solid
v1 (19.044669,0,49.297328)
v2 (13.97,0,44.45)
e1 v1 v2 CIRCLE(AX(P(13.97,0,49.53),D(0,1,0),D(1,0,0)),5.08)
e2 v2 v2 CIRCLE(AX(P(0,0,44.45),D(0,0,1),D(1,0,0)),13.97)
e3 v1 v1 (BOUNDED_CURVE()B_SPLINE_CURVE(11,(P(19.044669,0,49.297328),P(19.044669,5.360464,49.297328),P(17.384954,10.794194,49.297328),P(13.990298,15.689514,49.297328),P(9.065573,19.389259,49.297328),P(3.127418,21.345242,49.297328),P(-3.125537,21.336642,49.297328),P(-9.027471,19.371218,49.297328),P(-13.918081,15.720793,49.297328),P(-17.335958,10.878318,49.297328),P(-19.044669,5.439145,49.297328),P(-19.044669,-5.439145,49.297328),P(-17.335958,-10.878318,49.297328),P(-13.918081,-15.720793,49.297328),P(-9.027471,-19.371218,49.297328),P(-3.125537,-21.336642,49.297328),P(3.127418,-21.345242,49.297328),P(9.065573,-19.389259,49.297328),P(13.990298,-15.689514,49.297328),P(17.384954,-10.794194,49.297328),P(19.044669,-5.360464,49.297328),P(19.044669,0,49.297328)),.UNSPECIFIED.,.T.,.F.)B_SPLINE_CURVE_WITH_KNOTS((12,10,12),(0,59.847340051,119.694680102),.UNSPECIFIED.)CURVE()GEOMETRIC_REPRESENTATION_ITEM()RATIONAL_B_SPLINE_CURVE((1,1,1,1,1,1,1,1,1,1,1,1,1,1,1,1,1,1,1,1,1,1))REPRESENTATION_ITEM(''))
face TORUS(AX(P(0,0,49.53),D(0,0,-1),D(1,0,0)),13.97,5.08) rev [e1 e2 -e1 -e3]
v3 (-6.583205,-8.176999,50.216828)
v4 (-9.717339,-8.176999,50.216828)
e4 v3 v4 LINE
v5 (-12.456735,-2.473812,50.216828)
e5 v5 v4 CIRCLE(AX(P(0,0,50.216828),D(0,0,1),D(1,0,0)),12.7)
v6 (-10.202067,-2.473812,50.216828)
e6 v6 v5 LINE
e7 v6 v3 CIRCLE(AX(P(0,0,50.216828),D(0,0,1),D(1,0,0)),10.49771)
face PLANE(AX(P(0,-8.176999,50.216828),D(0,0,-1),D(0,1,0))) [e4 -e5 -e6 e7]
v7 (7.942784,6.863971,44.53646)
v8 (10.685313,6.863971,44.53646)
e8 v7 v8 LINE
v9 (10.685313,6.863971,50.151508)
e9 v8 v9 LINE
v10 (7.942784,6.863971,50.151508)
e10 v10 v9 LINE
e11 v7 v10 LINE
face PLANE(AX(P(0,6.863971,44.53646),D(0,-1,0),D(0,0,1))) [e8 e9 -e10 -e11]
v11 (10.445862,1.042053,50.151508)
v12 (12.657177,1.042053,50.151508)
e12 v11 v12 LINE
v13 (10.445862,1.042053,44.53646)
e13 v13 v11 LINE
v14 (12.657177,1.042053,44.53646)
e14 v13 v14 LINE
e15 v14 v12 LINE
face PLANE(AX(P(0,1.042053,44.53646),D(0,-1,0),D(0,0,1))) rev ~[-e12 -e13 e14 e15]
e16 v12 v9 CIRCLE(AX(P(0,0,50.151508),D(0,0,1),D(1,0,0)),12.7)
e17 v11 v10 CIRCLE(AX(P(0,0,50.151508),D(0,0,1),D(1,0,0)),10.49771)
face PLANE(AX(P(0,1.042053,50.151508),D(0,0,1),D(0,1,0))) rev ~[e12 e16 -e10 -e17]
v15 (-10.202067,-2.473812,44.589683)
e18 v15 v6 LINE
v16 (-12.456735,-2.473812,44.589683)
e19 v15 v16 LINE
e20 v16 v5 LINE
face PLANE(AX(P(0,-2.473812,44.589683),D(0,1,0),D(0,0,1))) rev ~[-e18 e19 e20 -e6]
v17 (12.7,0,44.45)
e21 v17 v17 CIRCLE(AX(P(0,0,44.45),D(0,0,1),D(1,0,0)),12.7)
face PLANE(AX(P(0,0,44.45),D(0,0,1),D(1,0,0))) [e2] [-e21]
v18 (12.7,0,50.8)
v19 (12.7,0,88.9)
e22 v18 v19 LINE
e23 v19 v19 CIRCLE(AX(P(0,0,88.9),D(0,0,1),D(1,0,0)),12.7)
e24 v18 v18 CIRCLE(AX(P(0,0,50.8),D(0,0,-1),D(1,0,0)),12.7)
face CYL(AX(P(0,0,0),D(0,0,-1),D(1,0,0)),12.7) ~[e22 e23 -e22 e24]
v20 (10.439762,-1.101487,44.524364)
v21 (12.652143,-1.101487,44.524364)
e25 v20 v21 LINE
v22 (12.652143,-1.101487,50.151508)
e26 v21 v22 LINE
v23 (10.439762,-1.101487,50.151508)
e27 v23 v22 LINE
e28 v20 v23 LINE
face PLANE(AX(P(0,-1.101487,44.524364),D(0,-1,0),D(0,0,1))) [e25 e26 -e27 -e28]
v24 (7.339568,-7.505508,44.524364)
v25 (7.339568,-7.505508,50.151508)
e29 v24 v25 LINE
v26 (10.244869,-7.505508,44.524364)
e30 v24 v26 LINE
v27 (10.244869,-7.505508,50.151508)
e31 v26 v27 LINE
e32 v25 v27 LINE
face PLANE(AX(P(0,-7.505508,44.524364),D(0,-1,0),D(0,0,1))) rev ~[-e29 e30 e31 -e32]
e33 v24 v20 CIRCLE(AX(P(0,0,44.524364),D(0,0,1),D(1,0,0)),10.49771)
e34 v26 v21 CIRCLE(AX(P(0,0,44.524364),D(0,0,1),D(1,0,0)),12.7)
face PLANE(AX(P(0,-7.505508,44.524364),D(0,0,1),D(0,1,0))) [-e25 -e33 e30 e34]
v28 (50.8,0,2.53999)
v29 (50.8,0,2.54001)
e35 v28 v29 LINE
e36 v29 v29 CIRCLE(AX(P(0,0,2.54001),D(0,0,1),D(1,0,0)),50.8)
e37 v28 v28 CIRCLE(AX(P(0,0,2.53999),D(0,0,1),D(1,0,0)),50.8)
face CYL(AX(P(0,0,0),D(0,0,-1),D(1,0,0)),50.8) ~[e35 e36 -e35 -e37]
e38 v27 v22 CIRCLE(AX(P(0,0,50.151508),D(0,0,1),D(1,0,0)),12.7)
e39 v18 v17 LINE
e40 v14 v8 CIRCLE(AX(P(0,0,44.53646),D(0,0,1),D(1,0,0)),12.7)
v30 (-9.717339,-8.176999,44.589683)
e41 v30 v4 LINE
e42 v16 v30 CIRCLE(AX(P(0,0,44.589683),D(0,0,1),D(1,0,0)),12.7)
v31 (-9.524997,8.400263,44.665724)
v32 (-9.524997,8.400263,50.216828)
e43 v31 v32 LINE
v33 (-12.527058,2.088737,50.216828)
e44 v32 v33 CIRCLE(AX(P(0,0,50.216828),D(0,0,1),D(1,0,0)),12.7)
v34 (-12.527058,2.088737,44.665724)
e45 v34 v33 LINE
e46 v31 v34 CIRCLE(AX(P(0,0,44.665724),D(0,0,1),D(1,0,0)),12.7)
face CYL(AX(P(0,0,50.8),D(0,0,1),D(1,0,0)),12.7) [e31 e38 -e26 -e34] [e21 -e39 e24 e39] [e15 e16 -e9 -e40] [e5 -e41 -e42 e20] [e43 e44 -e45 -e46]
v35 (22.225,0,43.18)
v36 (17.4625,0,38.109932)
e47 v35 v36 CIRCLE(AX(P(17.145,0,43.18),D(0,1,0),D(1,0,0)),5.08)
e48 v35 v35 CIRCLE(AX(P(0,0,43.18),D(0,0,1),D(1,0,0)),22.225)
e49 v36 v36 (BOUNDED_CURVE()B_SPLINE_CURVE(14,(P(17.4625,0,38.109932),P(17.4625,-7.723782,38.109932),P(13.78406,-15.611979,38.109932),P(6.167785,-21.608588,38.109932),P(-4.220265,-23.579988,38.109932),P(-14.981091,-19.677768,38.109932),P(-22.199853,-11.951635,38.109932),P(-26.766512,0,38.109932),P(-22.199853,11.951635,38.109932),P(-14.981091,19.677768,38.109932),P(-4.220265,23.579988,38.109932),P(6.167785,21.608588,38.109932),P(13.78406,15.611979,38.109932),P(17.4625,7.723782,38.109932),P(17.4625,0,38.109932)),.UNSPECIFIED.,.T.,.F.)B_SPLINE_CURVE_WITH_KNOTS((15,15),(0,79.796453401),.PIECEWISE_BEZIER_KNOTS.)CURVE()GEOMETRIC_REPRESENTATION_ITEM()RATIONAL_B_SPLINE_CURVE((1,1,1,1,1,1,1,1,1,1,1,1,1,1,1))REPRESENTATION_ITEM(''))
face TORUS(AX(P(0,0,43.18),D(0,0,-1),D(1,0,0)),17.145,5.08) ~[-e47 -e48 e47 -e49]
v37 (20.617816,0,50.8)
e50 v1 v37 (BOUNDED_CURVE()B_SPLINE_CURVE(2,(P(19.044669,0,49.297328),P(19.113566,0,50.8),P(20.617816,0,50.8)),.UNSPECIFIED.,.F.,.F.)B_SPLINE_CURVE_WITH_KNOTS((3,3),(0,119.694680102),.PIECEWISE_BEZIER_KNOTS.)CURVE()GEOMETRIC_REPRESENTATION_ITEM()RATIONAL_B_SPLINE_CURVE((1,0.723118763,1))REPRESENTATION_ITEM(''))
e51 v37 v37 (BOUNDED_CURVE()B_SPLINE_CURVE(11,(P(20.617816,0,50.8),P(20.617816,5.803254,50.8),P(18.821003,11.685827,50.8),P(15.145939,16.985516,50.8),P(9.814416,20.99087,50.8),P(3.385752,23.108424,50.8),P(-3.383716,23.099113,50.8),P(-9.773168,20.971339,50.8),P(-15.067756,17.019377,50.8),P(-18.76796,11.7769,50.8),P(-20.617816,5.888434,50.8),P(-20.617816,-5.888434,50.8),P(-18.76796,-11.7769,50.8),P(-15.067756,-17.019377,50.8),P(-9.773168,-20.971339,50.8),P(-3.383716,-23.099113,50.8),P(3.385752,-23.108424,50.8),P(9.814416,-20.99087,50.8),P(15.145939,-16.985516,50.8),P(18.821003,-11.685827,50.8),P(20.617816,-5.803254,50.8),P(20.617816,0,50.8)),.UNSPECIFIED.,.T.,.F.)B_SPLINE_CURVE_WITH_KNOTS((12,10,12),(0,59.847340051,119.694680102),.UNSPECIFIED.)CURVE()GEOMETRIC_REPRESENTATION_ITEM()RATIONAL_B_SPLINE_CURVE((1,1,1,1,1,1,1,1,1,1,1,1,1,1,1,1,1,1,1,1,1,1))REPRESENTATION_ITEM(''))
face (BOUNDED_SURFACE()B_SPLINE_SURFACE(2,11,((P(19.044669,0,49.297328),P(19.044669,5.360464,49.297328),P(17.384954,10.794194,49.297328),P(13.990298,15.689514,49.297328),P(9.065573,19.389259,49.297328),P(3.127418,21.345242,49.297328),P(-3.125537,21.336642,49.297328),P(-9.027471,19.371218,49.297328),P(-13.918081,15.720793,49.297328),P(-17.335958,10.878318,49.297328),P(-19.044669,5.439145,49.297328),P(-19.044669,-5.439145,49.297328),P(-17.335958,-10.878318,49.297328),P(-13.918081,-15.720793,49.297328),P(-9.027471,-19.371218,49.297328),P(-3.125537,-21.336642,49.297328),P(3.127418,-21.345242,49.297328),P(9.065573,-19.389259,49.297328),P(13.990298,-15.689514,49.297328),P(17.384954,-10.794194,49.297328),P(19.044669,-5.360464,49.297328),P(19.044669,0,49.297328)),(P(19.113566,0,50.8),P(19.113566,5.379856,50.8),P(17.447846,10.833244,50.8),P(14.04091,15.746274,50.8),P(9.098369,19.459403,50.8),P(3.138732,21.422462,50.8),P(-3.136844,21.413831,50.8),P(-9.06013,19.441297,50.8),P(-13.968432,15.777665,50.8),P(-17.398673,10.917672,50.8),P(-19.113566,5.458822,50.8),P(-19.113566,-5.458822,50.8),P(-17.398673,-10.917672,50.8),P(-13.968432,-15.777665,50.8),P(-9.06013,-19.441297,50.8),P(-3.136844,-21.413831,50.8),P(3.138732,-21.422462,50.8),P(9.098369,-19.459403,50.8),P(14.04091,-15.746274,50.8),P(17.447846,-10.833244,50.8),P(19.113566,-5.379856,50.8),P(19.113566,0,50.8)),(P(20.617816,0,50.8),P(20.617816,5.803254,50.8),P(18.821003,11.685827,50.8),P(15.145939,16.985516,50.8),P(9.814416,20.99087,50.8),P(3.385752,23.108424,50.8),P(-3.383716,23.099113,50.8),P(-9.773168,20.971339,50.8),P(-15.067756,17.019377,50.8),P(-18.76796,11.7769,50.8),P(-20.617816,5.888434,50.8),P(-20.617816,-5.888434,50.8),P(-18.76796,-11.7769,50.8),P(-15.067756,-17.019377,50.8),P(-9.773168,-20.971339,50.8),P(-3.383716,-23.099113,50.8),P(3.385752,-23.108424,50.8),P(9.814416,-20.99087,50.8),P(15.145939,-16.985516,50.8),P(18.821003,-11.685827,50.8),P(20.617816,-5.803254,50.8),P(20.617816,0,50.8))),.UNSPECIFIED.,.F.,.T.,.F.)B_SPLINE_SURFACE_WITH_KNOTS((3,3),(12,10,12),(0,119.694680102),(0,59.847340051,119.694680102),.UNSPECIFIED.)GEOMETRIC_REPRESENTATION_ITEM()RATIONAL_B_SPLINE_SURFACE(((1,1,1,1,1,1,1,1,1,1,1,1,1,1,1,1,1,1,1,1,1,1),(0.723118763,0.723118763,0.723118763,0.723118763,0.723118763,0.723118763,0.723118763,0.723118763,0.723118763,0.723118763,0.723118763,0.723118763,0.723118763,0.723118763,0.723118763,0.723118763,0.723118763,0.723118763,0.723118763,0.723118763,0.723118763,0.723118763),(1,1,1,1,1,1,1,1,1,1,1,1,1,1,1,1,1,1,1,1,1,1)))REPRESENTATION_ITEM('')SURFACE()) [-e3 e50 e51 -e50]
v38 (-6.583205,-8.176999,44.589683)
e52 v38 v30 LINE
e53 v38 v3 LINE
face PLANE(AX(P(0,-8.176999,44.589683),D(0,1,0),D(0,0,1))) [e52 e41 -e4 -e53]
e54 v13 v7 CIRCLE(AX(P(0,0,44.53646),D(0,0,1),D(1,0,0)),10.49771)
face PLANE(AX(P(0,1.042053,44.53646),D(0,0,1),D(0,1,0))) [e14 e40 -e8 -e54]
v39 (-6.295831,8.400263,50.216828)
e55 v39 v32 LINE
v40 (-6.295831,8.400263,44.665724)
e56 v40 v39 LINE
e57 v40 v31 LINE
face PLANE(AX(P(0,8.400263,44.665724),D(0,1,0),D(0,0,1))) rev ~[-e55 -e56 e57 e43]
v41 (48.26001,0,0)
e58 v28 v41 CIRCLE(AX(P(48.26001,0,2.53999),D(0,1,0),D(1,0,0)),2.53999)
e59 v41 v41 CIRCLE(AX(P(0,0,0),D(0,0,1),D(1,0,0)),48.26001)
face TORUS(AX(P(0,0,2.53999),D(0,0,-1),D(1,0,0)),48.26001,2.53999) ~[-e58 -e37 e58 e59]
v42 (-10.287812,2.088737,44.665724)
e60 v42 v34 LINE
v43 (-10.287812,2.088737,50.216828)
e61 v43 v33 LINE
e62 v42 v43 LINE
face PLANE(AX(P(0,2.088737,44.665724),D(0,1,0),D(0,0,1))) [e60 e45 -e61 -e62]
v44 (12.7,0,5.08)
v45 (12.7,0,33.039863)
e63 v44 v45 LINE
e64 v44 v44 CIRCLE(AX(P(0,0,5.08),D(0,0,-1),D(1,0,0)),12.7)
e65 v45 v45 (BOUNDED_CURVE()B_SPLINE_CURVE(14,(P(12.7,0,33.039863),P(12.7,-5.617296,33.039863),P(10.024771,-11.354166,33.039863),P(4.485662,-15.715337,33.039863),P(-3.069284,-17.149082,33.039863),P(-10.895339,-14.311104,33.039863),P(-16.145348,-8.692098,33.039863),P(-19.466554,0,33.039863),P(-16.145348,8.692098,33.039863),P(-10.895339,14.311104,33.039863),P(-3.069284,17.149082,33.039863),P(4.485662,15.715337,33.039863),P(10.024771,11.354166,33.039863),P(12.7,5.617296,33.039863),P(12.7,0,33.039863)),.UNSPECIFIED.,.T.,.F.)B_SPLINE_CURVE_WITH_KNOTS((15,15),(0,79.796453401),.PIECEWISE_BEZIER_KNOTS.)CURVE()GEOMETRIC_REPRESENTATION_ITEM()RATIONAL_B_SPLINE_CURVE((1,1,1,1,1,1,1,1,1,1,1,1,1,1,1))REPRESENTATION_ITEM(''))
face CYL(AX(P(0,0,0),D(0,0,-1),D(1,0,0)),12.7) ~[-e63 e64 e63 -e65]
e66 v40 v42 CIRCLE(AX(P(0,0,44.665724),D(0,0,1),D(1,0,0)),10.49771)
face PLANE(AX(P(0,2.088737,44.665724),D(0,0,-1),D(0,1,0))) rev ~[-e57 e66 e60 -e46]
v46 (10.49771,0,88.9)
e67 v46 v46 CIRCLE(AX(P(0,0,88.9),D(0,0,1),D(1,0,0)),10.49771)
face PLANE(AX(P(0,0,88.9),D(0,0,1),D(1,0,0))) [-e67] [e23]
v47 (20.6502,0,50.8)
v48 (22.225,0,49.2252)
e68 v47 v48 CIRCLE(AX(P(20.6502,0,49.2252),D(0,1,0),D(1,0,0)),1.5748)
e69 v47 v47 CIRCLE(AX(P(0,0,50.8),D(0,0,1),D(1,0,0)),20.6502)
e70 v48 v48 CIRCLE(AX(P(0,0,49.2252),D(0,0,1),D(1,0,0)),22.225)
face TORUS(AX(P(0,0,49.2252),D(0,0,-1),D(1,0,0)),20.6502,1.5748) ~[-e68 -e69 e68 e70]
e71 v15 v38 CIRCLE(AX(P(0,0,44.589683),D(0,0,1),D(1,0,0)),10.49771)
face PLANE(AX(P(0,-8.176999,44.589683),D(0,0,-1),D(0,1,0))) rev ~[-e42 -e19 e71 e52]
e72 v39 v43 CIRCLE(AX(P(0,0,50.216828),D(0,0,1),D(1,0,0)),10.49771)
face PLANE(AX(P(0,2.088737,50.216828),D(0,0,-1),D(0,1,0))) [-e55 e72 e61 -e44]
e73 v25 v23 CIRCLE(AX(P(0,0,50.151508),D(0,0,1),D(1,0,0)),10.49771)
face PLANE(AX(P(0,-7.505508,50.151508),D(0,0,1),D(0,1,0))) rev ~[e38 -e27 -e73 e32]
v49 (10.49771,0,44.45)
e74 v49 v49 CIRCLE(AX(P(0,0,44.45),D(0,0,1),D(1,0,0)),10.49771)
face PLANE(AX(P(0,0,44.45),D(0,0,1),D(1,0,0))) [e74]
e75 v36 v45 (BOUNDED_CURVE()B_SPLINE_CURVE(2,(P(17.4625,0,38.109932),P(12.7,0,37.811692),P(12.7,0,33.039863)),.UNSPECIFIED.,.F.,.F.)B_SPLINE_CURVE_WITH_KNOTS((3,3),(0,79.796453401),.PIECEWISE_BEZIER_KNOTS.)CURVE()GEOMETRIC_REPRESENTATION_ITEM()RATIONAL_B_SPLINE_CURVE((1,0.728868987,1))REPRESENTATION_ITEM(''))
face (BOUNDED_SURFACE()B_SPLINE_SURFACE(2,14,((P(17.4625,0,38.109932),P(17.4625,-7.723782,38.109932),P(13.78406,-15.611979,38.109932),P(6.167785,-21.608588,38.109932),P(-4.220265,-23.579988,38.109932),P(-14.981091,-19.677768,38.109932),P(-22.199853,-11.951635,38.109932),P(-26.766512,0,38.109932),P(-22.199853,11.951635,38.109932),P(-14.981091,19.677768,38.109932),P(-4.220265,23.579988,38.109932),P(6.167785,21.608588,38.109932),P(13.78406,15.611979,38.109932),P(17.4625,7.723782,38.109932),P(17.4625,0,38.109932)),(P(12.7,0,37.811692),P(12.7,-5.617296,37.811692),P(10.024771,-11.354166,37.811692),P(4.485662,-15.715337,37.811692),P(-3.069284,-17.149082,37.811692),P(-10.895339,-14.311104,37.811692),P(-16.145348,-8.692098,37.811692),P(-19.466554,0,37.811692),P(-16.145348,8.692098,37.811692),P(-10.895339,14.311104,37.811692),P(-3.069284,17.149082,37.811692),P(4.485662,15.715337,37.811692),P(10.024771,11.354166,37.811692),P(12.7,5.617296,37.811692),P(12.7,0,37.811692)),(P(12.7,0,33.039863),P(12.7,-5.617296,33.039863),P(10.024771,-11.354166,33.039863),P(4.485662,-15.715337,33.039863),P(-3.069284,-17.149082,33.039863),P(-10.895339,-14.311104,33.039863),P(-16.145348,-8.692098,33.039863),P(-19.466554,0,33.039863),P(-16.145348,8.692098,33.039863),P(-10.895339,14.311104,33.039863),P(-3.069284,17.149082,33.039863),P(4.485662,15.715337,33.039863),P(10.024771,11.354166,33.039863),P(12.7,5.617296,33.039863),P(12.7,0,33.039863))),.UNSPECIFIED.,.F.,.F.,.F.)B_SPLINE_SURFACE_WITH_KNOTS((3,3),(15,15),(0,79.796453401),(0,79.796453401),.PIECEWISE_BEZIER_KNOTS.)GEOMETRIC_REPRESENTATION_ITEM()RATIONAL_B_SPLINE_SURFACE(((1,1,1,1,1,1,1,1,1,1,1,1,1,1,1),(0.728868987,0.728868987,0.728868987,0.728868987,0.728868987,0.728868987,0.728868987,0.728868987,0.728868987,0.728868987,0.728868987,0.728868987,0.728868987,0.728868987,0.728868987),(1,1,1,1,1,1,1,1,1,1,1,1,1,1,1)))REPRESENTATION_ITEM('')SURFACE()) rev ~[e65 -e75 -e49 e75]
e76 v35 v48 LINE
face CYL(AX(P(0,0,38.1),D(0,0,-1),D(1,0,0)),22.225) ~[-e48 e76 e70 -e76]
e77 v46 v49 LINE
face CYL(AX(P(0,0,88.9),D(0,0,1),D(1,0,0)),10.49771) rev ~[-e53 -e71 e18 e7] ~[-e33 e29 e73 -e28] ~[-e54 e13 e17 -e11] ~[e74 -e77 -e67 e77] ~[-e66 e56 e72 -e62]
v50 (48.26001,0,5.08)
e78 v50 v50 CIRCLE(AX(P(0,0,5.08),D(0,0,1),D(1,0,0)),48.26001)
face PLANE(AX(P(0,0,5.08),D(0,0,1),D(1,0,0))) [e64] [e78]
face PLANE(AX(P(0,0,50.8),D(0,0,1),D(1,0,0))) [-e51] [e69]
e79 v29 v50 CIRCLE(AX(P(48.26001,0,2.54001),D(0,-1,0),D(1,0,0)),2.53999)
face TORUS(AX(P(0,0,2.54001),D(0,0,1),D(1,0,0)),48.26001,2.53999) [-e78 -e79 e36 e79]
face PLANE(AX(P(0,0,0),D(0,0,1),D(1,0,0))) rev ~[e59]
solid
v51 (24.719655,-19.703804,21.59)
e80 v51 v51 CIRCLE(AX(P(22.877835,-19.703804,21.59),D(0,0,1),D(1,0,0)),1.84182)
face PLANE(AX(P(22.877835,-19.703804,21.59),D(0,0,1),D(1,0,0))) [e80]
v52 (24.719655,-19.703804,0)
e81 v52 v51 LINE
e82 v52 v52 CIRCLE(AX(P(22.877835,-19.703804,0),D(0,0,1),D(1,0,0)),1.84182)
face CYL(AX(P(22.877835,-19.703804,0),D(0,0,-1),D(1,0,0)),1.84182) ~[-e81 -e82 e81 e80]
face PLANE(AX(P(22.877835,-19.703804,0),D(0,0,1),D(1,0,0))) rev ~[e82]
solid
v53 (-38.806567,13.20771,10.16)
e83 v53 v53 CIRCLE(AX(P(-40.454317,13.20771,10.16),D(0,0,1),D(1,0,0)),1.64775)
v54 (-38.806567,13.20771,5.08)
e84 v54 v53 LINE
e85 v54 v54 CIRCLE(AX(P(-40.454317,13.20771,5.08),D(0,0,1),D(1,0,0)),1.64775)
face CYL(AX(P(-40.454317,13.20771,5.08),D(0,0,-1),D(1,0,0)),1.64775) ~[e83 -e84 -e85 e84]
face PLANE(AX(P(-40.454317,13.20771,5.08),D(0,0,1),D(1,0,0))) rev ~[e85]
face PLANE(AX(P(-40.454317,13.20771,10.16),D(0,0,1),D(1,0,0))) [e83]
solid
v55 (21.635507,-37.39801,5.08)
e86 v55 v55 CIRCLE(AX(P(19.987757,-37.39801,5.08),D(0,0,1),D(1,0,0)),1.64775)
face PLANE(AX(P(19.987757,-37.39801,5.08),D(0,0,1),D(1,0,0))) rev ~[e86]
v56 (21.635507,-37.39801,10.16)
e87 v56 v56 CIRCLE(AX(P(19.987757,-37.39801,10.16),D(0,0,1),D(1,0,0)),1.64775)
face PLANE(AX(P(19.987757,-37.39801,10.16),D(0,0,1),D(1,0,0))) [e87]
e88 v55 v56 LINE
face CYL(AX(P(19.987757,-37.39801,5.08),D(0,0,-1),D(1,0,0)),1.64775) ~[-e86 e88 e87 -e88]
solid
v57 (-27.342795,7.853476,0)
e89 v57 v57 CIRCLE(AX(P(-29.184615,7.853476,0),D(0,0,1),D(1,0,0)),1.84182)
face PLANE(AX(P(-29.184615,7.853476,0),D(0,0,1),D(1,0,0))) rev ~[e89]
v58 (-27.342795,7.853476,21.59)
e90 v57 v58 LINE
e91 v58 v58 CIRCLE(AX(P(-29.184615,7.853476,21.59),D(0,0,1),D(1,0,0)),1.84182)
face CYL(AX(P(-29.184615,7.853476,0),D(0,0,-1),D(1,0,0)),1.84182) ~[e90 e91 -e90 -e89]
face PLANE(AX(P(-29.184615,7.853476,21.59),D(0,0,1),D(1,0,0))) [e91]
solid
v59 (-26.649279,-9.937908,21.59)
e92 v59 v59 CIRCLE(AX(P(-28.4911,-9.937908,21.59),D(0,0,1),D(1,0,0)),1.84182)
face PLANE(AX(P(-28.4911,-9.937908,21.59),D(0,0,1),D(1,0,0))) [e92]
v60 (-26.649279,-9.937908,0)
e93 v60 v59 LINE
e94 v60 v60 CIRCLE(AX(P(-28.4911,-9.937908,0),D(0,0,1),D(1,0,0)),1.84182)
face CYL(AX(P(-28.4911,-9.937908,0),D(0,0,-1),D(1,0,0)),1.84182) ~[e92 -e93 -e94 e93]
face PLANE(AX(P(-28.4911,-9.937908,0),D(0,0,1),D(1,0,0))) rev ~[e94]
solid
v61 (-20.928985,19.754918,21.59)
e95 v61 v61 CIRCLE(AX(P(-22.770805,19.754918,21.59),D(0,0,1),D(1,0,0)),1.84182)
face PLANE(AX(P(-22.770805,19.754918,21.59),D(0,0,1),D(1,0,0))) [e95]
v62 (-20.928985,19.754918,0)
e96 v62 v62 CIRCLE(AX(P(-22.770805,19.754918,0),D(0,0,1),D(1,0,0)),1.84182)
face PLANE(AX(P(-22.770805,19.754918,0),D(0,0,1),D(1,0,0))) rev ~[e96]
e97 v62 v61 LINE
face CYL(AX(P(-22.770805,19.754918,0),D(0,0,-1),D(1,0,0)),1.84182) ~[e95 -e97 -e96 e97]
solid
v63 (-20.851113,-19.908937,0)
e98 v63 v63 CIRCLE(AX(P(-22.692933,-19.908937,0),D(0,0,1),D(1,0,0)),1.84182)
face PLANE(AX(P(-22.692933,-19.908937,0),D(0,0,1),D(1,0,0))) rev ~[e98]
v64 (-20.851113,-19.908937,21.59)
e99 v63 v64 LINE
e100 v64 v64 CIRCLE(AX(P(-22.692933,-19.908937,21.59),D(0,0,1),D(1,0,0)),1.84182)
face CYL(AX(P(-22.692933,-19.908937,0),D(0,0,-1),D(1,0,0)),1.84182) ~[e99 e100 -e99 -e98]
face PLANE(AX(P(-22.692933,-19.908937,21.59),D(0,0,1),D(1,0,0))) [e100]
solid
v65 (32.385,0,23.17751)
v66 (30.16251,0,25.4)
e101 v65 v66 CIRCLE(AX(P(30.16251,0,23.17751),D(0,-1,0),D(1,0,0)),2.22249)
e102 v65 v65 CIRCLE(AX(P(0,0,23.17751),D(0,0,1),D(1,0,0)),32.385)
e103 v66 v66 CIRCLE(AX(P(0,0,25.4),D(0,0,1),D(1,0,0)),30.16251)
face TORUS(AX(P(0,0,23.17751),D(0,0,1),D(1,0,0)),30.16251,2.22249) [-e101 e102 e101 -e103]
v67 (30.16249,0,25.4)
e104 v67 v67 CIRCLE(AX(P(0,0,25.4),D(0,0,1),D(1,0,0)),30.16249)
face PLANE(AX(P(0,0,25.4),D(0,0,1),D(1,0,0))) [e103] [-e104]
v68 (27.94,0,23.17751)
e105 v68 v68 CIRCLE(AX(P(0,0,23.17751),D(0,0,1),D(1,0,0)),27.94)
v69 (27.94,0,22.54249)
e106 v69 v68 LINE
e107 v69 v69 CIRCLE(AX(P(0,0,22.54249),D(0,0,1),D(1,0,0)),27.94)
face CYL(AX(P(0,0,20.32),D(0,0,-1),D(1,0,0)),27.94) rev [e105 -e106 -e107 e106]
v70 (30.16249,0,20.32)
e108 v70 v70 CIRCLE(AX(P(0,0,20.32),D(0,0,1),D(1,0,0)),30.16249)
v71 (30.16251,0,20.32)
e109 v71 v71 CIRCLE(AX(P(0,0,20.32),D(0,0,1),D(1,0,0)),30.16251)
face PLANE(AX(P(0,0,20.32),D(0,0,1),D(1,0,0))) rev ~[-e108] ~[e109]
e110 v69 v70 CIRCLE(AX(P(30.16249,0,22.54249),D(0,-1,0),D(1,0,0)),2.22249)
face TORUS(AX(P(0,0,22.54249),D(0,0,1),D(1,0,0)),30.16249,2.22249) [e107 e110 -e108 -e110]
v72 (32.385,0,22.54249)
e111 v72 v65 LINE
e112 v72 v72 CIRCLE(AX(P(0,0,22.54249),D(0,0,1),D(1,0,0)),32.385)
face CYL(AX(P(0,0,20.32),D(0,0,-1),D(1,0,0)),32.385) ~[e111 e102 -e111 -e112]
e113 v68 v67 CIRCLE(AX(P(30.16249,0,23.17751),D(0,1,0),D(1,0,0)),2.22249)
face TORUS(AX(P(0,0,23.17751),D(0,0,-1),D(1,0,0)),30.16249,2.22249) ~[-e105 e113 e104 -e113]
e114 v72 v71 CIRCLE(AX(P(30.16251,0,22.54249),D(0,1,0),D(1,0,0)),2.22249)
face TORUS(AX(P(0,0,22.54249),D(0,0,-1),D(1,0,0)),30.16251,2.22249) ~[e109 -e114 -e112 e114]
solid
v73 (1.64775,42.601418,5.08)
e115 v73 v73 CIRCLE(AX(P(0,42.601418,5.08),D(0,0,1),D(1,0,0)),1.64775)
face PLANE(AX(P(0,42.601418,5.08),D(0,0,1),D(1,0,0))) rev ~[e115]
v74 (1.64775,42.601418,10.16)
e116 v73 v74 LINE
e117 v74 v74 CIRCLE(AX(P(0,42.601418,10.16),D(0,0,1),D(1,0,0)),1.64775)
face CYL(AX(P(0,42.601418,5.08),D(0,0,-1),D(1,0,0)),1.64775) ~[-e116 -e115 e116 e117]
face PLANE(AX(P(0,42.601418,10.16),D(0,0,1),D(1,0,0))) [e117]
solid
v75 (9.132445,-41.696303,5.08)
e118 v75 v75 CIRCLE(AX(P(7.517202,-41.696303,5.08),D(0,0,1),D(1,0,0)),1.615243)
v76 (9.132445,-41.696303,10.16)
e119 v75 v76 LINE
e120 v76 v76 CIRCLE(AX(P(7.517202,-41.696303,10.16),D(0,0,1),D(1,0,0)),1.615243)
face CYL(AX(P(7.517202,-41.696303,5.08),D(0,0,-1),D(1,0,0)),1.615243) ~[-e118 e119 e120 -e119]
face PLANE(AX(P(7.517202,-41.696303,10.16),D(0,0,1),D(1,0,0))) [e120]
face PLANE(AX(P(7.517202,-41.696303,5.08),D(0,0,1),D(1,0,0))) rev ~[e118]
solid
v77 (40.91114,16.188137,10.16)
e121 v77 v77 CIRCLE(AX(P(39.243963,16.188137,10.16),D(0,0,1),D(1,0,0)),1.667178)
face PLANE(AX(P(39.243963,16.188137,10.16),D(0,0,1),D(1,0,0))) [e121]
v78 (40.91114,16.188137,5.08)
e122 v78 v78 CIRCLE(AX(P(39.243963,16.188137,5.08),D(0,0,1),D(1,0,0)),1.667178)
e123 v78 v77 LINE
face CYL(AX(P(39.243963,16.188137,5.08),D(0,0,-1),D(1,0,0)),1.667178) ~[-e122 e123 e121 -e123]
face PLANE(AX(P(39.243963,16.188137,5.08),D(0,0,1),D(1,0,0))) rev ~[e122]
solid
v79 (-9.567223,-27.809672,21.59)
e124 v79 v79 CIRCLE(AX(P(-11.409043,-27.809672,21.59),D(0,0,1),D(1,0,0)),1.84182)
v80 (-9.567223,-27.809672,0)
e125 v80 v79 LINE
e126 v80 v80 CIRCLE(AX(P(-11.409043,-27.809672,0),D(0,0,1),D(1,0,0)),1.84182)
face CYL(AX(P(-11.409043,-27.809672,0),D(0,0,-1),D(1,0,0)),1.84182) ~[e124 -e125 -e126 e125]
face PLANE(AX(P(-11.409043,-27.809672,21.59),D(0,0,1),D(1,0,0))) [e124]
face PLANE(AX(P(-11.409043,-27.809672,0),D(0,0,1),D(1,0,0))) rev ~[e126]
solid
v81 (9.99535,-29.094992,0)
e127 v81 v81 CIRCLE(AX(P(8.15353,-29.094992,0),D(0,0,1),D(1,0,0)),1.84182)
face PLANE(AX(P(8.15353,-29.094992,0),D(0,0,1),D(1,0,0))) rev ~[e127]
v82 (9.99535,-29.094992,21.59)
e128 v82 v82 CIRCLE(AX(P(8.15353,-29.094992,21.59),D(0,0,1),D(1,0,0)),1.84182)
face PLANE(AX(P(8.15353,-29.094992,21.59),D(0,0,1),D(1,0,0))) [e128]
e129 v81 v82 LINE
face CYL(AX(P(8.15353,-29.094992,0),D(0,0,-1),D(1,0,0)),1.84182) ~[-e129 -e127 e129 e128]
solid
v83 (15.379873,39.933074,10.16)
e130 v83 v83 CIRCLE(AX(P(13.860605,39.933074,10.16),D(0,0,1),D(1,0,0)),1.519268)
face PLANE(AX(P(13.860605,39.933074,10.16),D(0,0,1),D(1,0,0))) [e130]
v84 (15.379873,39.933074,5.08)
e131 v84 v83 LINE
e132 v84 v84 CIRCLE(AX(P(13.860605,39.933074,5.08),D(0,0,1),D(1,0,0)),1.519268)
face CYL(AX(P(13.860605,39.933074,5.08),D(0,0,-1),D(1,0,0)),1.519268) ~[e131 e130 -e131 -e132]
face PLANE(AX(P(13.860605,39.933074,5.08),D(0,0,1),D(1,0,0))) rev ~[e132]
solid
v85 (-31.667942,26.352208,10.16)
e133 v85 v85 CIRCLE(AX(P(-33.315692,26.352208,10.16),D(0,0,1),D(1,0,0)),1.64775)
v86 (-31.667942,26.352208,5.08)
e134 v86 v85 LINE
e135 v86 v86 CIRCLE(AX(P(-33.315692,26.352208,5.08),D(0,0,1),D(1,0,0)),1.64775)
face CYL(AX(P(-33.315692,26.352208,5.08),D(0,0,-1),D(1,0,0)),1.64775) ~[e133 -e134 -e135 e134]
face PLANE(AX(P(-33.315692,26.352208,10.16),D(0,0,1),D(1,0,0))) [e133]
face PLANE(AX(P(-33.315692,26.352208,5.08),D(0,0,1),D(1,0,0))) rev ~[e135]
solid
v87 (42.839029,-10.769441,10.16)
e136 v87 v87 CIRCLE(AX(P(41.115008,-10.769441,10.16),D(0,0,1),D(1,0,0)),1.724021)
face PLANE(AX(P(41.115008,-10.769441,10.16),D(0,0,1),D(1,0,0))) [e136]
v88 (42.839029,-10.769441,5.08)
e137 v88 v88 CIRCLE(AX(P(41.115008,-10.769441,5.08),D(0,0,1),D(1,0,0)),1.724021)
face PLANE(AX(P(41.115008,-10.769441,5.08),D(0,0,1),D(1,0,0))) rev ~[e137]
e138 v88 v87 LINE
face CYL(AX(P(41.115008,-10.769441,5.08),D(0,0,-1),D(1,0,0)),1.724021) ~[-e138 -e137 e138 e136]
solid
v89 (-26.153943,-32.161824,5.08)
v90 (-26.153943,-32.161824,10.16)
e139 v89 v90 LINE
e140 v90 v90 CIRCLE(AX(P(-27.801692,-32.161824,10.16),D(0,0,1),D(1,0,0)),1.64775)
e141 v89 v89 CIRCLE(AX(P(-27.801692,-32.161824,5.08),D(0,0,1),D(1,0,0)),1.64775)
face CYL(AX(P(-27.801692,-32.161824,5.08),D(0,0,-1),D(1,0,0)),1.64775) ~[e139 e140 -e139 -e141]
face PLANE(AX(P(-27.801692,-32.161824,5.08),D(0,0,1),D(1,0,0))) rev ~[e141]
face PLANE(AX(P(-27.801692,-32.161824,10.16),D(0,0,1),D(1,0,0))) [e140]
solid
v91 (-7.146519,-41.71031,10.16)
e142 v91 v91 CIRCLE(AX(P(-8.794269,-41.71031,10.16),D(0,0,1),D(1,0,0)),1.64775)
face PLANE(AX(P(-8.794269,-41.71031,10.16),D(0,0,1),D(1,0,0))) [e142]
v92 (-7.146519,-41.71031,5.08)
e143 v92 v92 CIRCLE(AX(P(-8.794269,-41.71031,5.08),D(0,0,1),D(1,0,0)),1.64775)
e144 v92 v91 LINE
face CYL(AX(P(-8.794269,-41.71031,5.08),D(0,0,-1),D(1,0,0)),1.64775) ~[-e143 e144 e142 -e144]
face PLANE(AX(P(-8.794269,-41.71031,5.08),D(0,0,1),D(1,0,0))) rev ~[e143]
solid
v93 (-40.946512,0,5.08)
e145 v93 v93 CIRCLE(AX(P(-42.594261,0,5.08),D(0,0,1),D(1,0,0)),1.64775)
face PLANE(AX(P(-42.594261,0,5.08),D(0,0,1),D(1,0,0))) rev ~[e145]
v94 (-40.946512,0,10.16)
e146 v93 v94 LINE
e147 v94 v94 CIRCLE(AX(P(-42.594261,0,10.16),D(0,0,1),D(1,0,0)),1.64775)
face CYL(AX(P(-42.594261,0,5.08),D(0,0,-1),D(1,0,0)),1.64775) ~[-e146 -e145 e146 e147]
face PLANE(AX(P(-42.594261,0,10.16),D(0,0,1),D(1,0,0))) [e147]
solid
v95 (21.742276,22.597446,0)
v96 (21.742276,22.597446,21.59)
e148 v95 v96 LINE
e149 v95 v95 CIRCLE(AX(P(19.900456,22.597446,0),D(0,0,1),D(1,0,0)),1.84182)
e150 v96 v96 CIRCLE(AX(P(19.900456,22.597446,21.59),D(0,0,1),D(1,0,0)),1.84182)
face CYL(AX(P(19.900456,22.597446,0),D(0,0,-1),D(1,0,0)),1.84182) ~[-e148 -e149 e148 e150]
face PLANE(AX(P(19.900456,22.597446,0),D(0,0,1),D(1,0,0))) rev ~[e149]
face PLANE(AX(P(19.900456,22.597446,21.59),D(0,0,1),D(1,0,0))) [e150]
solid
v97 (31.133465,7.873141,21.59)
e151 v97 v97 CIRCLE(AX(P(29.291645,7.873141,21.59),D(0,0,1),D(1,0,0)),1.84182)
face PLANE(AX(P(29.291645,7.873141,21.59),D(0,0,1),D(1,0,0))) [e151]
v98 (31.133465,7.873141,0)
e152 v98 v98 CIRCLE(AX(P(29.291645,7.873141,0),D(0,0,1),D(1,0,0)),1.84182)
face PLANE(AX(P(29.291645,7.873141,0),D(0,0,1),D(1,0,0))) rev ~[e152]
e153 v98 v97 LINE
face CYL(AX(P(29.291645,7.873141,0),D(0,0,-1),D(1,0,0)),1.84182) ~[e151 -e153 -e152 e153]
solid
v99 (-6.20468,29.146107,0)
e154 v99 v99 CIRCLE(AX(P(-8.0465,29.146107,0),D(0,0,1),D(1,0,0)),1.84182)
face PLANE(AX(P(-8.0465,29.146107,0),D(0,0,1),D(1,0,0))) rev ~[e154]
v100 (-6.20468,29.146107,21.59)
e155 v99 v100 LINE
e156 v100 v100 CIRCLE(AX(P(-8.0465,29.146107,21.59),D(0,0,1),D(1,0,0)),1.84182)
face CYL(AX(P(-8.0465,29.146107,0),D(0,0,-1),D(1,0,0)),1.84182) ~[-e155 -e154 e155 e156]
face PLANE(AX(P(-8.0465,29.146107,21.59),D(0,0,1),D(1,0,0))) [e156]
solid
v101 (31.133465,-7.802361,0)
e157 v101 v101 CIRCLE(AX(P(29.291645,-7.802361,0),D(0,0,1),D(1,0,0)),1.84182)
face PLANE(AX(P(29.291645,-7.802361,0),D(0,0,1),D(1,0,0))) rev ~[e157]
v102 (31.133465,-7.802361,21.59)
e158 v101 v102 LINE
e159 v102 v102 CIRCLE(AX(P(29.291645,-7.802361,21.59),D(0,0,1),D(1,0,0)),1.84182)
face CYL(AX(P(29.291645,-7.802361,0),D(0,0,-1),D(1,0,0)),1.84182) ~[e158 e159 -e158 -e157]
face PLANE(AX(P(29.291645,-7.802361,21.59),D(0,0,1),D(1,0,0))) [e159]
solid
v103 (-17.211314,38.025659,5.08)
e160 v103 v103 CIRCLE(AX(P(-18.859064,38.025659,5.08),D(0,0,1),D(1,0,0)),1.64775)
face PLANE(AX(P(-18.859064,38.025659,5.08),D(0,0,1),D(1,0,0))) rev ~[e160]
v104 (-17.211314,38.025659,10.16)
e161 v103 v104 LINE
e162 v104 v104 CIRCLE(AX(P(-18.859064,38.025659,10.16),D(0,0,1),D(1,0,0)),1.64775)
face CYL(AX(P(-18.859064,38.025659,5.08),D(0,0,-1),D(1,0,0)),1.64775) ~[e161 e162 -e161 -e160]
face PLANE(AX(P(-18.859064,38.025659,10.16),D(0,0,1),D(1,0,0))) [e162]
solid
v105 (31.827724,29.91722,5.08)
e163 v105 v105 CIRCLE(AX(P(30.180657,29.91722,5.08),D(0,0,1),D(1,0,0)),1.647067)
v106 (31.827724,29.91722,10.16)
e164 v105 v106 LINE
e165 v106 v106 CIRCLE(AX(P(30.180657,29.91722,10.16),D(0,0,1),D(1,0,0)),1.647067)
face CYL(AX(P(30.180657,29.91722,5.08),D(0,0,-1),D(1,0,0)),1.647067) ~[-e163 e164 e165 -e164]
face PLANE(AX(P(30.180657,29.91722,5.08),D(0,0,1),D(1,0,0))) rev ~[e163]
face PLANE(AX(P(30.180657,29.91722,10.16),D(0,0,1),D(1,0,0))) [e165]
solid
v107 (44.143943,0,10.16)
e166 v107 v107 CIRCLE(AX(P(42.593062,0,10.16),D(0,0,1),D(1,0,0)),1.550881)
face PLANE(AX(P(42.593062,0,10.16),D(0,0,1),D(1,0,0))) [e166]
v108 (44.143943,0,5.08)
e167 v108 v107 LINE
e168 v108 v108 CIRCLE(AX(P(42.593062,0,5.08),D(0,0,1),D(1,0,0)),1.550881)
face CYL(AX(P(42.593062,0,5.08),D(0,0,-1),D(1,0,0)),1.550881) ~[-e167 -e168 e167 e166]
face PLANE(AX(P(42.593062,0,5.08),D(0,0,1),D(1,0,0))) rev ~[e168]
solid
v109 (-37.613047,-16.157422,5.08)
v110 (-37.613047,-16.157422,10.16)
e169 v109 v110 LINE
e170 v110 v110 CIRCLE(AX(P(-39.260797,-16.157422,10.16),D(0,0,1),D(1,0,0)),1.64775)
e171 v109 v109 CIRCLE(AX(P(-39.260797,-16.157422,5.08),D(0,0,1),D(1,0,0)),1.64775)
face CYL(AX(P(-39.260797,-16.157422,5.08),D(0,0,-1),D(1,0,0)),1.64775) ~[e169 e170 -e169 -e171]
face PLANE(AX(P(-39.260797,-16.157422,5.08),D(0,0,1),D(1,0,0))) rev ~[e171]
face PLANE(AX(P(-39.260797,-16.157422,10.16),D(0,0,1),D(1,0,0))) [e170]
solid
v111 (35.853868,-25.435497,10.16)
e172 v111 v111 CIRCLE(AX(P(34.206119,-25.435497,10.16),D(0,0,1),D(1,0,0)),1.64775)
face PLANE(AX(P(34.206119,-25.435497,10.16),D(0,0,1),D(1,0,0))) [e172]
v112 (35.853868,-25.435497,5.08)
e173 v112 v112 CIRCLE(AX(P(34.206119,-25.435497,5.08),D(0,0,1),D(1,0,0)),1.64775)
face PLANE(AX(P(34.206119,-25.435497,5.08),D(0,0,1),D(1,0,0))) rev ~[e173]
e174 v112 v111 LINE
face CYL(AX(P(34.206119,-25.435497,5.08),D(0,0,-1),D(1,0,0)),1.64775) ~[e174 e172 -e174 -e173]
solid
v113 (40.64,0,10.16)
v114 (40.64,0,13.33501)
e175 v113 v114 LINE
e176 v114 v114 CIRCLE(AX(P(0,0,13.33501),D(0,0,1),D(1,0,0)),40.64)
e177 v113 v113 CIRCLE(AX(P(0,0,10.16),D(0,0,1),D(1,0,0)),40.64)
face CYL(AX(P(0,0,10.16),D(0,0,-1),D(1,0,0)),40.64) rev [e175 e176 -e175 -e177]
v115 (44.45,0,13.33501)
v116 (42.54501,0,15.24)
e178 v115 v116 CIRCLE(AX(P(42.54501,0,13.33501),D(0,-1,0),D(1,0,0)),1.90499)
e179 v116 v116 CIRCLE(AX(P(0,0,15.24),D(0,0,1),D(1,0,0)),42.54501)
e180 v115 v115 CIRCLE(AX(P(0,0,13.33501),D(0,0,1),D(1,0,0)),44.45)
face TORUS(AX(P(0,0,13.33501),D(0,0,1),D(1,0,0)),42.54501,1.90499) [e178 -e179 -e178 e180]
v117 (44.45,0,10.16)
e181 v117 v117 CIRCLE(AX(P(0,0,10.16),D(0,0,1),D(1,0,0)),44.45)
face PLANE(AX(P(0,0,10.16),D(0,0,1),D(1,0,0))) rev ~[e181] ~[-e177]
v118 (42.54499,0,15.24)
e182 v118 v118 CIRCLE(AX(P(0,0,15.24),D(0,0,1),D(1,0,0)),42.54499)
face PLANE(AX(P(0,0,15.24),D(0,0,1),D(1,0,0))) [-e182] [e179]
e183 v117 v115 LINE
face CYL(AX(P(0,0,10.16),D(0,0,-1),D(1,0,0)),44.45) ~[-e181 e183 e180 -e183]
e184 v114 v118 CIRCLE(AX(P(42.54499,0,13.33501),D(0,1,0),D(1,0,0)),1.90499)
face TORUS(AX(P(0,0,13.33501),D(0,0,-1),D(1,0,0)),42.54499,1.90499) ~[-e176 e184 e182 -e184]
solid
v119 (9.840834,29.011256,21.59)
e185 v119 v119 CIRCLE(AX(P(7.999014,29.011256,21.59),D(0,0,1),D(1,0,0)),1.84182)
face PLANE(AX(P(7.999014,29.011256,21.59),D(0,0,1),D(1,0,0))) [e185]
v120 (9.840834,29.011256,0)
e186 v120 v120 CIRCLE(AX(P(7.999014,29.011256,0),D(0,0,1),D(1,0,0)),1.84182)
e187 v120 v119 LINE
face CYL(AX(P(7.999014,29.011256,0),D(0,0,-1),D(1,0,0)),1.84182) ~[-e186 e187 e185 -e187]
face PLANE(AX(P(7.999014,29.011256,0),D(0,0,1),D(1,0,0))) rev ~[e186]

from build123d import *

# Parameters (mm, degrees)
F0_R      = 50.8
F1_DEPTH  = 5.08
F2_R      = 2.53999
F3_R      = 12.7
F4_DEPTH  = 88.9
F6_START  = 38.1
F5_R      = 22.225
F6_DEPTH  = 12.7
F7_R      = 5.08
F8_R      = 19.05
F8_R_2    = 12.7
F9_DEPTH  = 6.35
F10_R     = 5.08
F11_W     = 5.7031868491
F11_H     = 5.6271441281
F11_W_2   = 6.3115260564
F11_H_2   = 5.5511035025
F12_DEPTH = 12.7
F13_W     = 6.40402094
F13_H     = 5.6271441281
F13_W_2   = 5.8219179045
F13_H_2   = 5.6150481105
F14_DEPTH = 12.7
F15_R     = 10.4977096987
F16_DEPTH = 44.45
F17_R     = 1.574799746
F19_START = 20.32
F18_R     = 32.385
F18_R_2   = 27.94
F19_DEPTH = 5.08
F20_R     = 2.22249
F21_R     = 1.8418202524
F22_DEPTH = 21.59
F24_START = 10.16
F23_R     = 44.45
F23_R_2   = 40.64
F24_DEPTH = 5.08
F25_R     = 1.90499
F27_START = 5.08
F26_R     = 1.6477497362
F27_DEPTH = 5.08
F26_R_2   = 1.5192679806
F26_R_3   = 1.6470665841
F26_R_4   = 1.6671776114
F26_R_5   = 1.5508814679
F26_R_6   = 1.7240210591
F26_R_7   = 1.6152426744
F28_R     = 5.08


# Not quite as in the source:
# - a fillet or chamfer is up to 0.001 mm smaller than in the source, because OpenCascade refuses the exact size


with BuildPart() as f1:
    # F0 (on Top) → F1 (new body)
    with BuildSketch(Plane.XY):
        Circle(F0_R)
    extrude(amount=F1_DEPTH)

    # F2 (radius 2.54 in the source; OpenCascade refuses exactly that, so slightly less here)
    f2_edges = [f1.edges().sort_by_distance(p)[0] for p in [
        (50.8, 0, 2.54),
        (-50.8, 0, 0),
        (-50.8, 0, 5.08),
    ]]
    fillet(f2_edges, radius=F2_R)

    # F3 (on Top) → F4 (join)
    with BuildSketch(Plane.XY):
        Circle(F3_R)
    extrude(amount=F4_DEPTH)

    # F5 (on Top) → F6 (join)
    with BuildSketch(Plane.XY.offset(F6_START)):
        Circle(F5_R)
    extrude(amount=F6_DEPTH)

    # F7
    f7_edges = [f1.edges().sort_by_distance(p)[0] for p in [
        (-22.225, 0, 38.1),
    ]]
    fillet(f7_edges, radius=F7_R)

    # F8 (on face) → F9 (cut)
    with BuildSketch(Plane.XY.offset(50.8)):
        Circle(F8_R)
        Circle(F8_R_2, mode=Mode.SUBTRACT)
    extrude(amount=-F9_DEPTH, mode=Mode.SUBTRACT)

    # F10
    f10_edges = [f1.edges().sort_by_distance(p)[0] for p in [
        (-19.05, 0, 44.45),
    ]]
    fillet(f10_edges, radius=F10_R)

    # F11 (on Right) → F12 (cut)
    with BuildSketch(Plane.YZ):
        with Locations((-5.325405742, 47.4032554775)):
            Rectangle(F11_W, F11_H)
        with Locations((5.2445002366, 47.4412757903)):
            Rectangle(F11_W_2, F11_H_2)
    extrude(amount=-F12_DEPTH, mode=Mode.SUBTRACT)

    # F13 (on Right) → F14 (cut)
    with BuildSketch(Plane.YZ):
        with Locations((-4.3034976698, 47.3379362375)):
            Rectangle(F13_W, F13_H)
        with Locations((3.9530118229, 47.3439842463)):
            Rectangle(F13_W_2, F13_H_2)
    extrude(amount=F14_DEPTH, mode=Mode.SUBTRACT)

    # F15 (on face) → F16 (cut)
    with BuildSketch(Plane.XY.offset(88.9)):
        Circle(F15_R)
    extrude(amount=-F16_DEPTH, mode=Mode.SUBTRACT)

    # F17
    f17_edges = [f1.edges().sort_by_distance(p)[0] for p in [
        (-19.05, 0, 50.8),
        (-22.225, 0, 50.8),
    ]]
    fillet(f17_edges, radius=F17_R)

    # F28
    f28_edges = [f1.edges().sort_by_distance(p)[0] for p in [
        (-12.7, 0, 38.1),
    ]]
    fillet(f28_edges, radius=F28_R)


with BuildPart() as f19:
    # F18 (on Top) → F19 (new body)
    with BuildSketch(Plane.XY.offset(F19_START)):
        Circle(F18_R)
        Circle(F18_R_2, mode=Mode.SUBTRACT)
    extrude(amount=F19_DEPTH)

    # F20 (radius 2.2225 in the source; OpenCascade refuses exactly that, so slightly less here)
    f20_edges = [f19.edges().sort_by_distance(p)[0] for p in [
        (-27.94, 0, 25.4),
        (-32.385, 0, 25.4),
        (-27.94, 0, 20.32),
        (-32.385, 0, 20.32),
    ]]
    fillet(f20_edges, radius=F20_R)


with BuildPart() as f22:
    # F21 (on Top) → F22 (new body)
    with BuildSketch(Plane.XY):
        with Locations((-11.4090433344, -27.8096720576)):
            Circle(F21_R)
    extrude(amount=F22_DEPTH)


with BuildPart() as f22b:
    # F21 (on Top) → F22, piece 2 (new body)
    with BuildSketch(Plane.XY):
        with Locations((8.1535298377, -29.0949922055)):
            Circle(F21_R)
    extrude(amount=F22_DEPTH)


with BuildPart() as f22c:
    # F21 (on Top) → F22, piece 3 (new body)
    with BuildSketch(Plane.XY):
        with Locations((22.8778347373, -19.703803584)):
            Circle(F21_R)
    extrude(amount=F22_DEPTH)


with BuildPart() as f22d:
    # F21 (on Top) → F22, piece 4 (new body)
    with BuildSketch(Plane.XY):
        with Locations((-22.6929332038, -19.9089368758)):
            Circle(F21_R)
    extrude(amount=F22_DEPTH)


with BuildPart() as f22e:
    # F21 (on Top) → F22, piece 5 (new body)
    with BuildSketch(Plane.XY):
        with Locations((29.2916446924, -7.8023611568)):
            Circle(F21_R)
    extrude(amount=F22_DEPTH)


with BuildPart() as f22f:
    # F21 (on Top) → F22, piece 6 (new body)
    with BuildSketch(Plane.XY):
        with Locations((29.2916446924, 7.8731411513)):
            Circle(F21_R)
    extrude(amount=F22_DEPTH)


with BuildPart() as f22g:
    # F21 (on Top) → F22, piece 7 (new body)
    with BuildSketch(Plane.XY):
        with Locations((19.9004560709, 22.5974460508)):
            Circle(F21_R)
    extrude(amount=F22_DEPTH)


with BuildPart() as f22h:
    # F21 (on Top) → F22, piece 8 (new body)
    with BuildSketch(Plane.XY):
        with Locations((7.9990136437, 29.011256006)):
            Circle(F21_R)
    extrude(amount=F22_DEPTH)


with BuildPart() as f22i:
    # F21 (on Top) → F22, piece 9 (new body)
    with BuildSketch(Plane.XY):
        with Locations((-8.0465003848, 29.1461069137)):
            Circle(F21_R)
    extrude(amount=F22_DEPTH)


with BuildPart() as f22j:
    # F21 (on Top) → F22, piece 10 (new body)
    with BuildSketch(Plane.XY):
        with Locations((-22.7708052844, 19.7549182922)):
            Circle(F21_R)
    extrude(amount=F22_DEPTH)


with BuildPart() as f22k:
    # F21 (on Top) → F22, piece 11 (new body)
    with BuildSketch(Plane.XY):
        with Locations((-29.1846152395, 7.853475865)):
            Circle(F21_R)
    extrude(amount=F22_DEPTH)


with BuildPart() as f22l:
    # F21 (on Top) → F22, piece 12 (new body)
    with BuildSketch(Plane.XY):
        with Locations((-28.4910995079, -9.9379075691)):
            Circle(F21_R)
    extrude(amount=F22_DEPTH)


with BuildPart() as f24:
    # F23 (on Top) → F24 (new body)
    with BuildSketch(Plane.XY.offset(F24_START)):
        Circle(F23_R)
        Circle(F23_R_2, mode=Mode.SUBTRACT)
    extrude(amount=F24_DEPTH)

    # F25 (radius 1.905 in the source; OpenCascade refuses exactly that, so slightly less here)
    f25_edges = [f24.edges().sort_by_distance(p)[0] for p in [
        (-40.64, 0, 15.24),
        (-44.45, 0, 15.24),
    ]]
    fillet(f25_edges, radius=F25_R)


with BuildPart() as f27:
    # F26 (on Top) → F27 (new body)
    with BuildSketch(Plane.XY.offset(F27_START)):
        with Locations((-18.8590642065, 38.0256585777)):
            Circle(F26_R)
    extrude(amount=F27_DEPTH)


with BuildPart() as f27b:
    # F26 (on Top) → F27, piece 2 (new body)
    with BuildSketch(Plane.XY.offset(F27_START)):
        with Locations((0, 42.6014177501)):
            Circle(F26_R)
    extrude(amount=F27_DEPTH)


with BuildPart() as f27c:
    # F26 (on Top) → F27, piece 3 (new body)
    with BuildSketch(Plane.XY.offset(F27_START)):
        with Locations((-33.3156920969, 26.3522081077)):
            Circle(F26_R)
    extrude(amount=F27_DEPTH)


with BuildPart() as f27d:
    # F26 (on Top) → F27, piece 4 (new body)
    with BuildSketch(Plane.XY.offset(F27_START)):
        with Locations((-40.4543168843, 13.2077103481)):
            Circle(F26_R)
    extrude(amount=F27_DEPTH)


with BuildPart() as f27e:
    # F26 (on Top) → F27, piece 5 (new body)
    with BuildSketch(Plane.XY.offset(F27_START)):
        with Locations((-42.5942614675, 0)):
            Circle(F26_R)
    extrude(amount=F27_DEPTH)


with BuildPart() as f27f:
    # F26 (on Top) → F27, piece 6 (new body)
    with BuildSketch(Plane.XY.offset(F27_START)):
        with Locations((-39.2607972026, -16.1574222147)):
            Circle(F26_R)
    extrude(amount=F27_DEPTH)


with BuildPart() as f27g:
    # F26 (on Top) → F27, piece 7 (new body)
    with BuildSketch(Plane.XY.offset(F27_START)):
        with Locations((-27.8016924858, -32.1618244052)):
            Circle(F26_R)
    extrude(amount=F27_DEPTH)


with BuildPart() as f27h:
    # F26 (on Top) → F27, piece 8 (new body)
    with BuildSketch(Plane.XY.offset(F27_START)):
        with Locations((-8.7942685932, -41.7103096843)):
            Circle(F26_R)
    extrude(amount=F27_DEPTH)


with BuildPart() as f27i:
    # F26 (on Top) → F27, piece 9 (new body)
    with BuildSketch(Plane.XY.offset(F27_START)):
        with Locations((19.987757122, -37.3980102661)):
            Circle(F26_R)
    extrude(amount=F27_DEPTH)


with BuildPart() as f27j:
    # F26 (on Top) → F27, piece 10 (new body)
    with BuildSketch(Plane.XY.offset(F27_START)):
        with Locations((34.2061186544, -25.4354966852)):
            Circle(F26_R)
    extrude(amount=F27_DEPTH)


with BuildPart() as f27k:
    # F26 (on Top) → F27, piece 11 (new body)
    with BuildSketch(Plane.XY.offset(F27_START)):
        with Locations((13.8606047258, 39.9330742657)):
            Circle(F26_R_2)
    extrude(amount=F27_DEPTH)


with BuildPart() as f27l:
    # F26 (on Top) → F27, piece 12 (new body)
    with BuildSketch(Plane.XY.offset(F27_START)):
        with Locations((30.1806572825, 29.9172196537)):
            Circle(F26_R_3)
    extrude(amount=F27_DEPTH)


with BuildPart() as f27m:
    # F26 (on Top) → F27, piece 13 (new body)
    with BuildSketch(Plane.XY.offset(F27_START)):
        with Locations((39.2439626157, 16.1881372333)):
            Circle(F26_R_4)
    extrude(amount=F27_DEPTH)


with BuildPart() as f27n:
    # F26 (on Top) → F27, piece 14 (new body)
    with BuildSketch(Plane.XY.offset(F27_START)):
        with Locations((42.593061924, 0)):
            Circle(F26_R_5)
    extrude(amount=F27_DEPTH)


with BuildPart() as f27o:
    # F26 (on Top) → F27, piece 15 (new body)
    with BuildSketch(Plane.XY.offset(F27_START)):
        with Locations((41.1150082946, -10.7694407925)):
            Circle(F26_R_6)
    extrude(amount=F27_DEPTH)


with BuildPart() as f27p:
    # F26 (on Top) → F27, piece 16 (new body)
    with BuildSketch(Plane.XY.offset(F27_START)):
        with Locations((7.5172022916, -41.6963025928)):
            Circle(F26_R_7)
    extrude(amount=F27_DEPTH)


solid = Compound([f1.part, f19.part, f22.part, f22b.part, f22c.part, f22d.part, f22e.part, f22f.part, f22g.part, f22h.part, f22i.part, f22j.part, f22k.part, f22l.part, f24.part, f27.part, f27b.part, f27c.part, f27d.part, f27e.part, f27f.part, f27g.part, f27h.part, f27i.part, f27j.part, f27k.part, f27l.part, f27m.part, f27n.part, f27o.part, f27p.part])
